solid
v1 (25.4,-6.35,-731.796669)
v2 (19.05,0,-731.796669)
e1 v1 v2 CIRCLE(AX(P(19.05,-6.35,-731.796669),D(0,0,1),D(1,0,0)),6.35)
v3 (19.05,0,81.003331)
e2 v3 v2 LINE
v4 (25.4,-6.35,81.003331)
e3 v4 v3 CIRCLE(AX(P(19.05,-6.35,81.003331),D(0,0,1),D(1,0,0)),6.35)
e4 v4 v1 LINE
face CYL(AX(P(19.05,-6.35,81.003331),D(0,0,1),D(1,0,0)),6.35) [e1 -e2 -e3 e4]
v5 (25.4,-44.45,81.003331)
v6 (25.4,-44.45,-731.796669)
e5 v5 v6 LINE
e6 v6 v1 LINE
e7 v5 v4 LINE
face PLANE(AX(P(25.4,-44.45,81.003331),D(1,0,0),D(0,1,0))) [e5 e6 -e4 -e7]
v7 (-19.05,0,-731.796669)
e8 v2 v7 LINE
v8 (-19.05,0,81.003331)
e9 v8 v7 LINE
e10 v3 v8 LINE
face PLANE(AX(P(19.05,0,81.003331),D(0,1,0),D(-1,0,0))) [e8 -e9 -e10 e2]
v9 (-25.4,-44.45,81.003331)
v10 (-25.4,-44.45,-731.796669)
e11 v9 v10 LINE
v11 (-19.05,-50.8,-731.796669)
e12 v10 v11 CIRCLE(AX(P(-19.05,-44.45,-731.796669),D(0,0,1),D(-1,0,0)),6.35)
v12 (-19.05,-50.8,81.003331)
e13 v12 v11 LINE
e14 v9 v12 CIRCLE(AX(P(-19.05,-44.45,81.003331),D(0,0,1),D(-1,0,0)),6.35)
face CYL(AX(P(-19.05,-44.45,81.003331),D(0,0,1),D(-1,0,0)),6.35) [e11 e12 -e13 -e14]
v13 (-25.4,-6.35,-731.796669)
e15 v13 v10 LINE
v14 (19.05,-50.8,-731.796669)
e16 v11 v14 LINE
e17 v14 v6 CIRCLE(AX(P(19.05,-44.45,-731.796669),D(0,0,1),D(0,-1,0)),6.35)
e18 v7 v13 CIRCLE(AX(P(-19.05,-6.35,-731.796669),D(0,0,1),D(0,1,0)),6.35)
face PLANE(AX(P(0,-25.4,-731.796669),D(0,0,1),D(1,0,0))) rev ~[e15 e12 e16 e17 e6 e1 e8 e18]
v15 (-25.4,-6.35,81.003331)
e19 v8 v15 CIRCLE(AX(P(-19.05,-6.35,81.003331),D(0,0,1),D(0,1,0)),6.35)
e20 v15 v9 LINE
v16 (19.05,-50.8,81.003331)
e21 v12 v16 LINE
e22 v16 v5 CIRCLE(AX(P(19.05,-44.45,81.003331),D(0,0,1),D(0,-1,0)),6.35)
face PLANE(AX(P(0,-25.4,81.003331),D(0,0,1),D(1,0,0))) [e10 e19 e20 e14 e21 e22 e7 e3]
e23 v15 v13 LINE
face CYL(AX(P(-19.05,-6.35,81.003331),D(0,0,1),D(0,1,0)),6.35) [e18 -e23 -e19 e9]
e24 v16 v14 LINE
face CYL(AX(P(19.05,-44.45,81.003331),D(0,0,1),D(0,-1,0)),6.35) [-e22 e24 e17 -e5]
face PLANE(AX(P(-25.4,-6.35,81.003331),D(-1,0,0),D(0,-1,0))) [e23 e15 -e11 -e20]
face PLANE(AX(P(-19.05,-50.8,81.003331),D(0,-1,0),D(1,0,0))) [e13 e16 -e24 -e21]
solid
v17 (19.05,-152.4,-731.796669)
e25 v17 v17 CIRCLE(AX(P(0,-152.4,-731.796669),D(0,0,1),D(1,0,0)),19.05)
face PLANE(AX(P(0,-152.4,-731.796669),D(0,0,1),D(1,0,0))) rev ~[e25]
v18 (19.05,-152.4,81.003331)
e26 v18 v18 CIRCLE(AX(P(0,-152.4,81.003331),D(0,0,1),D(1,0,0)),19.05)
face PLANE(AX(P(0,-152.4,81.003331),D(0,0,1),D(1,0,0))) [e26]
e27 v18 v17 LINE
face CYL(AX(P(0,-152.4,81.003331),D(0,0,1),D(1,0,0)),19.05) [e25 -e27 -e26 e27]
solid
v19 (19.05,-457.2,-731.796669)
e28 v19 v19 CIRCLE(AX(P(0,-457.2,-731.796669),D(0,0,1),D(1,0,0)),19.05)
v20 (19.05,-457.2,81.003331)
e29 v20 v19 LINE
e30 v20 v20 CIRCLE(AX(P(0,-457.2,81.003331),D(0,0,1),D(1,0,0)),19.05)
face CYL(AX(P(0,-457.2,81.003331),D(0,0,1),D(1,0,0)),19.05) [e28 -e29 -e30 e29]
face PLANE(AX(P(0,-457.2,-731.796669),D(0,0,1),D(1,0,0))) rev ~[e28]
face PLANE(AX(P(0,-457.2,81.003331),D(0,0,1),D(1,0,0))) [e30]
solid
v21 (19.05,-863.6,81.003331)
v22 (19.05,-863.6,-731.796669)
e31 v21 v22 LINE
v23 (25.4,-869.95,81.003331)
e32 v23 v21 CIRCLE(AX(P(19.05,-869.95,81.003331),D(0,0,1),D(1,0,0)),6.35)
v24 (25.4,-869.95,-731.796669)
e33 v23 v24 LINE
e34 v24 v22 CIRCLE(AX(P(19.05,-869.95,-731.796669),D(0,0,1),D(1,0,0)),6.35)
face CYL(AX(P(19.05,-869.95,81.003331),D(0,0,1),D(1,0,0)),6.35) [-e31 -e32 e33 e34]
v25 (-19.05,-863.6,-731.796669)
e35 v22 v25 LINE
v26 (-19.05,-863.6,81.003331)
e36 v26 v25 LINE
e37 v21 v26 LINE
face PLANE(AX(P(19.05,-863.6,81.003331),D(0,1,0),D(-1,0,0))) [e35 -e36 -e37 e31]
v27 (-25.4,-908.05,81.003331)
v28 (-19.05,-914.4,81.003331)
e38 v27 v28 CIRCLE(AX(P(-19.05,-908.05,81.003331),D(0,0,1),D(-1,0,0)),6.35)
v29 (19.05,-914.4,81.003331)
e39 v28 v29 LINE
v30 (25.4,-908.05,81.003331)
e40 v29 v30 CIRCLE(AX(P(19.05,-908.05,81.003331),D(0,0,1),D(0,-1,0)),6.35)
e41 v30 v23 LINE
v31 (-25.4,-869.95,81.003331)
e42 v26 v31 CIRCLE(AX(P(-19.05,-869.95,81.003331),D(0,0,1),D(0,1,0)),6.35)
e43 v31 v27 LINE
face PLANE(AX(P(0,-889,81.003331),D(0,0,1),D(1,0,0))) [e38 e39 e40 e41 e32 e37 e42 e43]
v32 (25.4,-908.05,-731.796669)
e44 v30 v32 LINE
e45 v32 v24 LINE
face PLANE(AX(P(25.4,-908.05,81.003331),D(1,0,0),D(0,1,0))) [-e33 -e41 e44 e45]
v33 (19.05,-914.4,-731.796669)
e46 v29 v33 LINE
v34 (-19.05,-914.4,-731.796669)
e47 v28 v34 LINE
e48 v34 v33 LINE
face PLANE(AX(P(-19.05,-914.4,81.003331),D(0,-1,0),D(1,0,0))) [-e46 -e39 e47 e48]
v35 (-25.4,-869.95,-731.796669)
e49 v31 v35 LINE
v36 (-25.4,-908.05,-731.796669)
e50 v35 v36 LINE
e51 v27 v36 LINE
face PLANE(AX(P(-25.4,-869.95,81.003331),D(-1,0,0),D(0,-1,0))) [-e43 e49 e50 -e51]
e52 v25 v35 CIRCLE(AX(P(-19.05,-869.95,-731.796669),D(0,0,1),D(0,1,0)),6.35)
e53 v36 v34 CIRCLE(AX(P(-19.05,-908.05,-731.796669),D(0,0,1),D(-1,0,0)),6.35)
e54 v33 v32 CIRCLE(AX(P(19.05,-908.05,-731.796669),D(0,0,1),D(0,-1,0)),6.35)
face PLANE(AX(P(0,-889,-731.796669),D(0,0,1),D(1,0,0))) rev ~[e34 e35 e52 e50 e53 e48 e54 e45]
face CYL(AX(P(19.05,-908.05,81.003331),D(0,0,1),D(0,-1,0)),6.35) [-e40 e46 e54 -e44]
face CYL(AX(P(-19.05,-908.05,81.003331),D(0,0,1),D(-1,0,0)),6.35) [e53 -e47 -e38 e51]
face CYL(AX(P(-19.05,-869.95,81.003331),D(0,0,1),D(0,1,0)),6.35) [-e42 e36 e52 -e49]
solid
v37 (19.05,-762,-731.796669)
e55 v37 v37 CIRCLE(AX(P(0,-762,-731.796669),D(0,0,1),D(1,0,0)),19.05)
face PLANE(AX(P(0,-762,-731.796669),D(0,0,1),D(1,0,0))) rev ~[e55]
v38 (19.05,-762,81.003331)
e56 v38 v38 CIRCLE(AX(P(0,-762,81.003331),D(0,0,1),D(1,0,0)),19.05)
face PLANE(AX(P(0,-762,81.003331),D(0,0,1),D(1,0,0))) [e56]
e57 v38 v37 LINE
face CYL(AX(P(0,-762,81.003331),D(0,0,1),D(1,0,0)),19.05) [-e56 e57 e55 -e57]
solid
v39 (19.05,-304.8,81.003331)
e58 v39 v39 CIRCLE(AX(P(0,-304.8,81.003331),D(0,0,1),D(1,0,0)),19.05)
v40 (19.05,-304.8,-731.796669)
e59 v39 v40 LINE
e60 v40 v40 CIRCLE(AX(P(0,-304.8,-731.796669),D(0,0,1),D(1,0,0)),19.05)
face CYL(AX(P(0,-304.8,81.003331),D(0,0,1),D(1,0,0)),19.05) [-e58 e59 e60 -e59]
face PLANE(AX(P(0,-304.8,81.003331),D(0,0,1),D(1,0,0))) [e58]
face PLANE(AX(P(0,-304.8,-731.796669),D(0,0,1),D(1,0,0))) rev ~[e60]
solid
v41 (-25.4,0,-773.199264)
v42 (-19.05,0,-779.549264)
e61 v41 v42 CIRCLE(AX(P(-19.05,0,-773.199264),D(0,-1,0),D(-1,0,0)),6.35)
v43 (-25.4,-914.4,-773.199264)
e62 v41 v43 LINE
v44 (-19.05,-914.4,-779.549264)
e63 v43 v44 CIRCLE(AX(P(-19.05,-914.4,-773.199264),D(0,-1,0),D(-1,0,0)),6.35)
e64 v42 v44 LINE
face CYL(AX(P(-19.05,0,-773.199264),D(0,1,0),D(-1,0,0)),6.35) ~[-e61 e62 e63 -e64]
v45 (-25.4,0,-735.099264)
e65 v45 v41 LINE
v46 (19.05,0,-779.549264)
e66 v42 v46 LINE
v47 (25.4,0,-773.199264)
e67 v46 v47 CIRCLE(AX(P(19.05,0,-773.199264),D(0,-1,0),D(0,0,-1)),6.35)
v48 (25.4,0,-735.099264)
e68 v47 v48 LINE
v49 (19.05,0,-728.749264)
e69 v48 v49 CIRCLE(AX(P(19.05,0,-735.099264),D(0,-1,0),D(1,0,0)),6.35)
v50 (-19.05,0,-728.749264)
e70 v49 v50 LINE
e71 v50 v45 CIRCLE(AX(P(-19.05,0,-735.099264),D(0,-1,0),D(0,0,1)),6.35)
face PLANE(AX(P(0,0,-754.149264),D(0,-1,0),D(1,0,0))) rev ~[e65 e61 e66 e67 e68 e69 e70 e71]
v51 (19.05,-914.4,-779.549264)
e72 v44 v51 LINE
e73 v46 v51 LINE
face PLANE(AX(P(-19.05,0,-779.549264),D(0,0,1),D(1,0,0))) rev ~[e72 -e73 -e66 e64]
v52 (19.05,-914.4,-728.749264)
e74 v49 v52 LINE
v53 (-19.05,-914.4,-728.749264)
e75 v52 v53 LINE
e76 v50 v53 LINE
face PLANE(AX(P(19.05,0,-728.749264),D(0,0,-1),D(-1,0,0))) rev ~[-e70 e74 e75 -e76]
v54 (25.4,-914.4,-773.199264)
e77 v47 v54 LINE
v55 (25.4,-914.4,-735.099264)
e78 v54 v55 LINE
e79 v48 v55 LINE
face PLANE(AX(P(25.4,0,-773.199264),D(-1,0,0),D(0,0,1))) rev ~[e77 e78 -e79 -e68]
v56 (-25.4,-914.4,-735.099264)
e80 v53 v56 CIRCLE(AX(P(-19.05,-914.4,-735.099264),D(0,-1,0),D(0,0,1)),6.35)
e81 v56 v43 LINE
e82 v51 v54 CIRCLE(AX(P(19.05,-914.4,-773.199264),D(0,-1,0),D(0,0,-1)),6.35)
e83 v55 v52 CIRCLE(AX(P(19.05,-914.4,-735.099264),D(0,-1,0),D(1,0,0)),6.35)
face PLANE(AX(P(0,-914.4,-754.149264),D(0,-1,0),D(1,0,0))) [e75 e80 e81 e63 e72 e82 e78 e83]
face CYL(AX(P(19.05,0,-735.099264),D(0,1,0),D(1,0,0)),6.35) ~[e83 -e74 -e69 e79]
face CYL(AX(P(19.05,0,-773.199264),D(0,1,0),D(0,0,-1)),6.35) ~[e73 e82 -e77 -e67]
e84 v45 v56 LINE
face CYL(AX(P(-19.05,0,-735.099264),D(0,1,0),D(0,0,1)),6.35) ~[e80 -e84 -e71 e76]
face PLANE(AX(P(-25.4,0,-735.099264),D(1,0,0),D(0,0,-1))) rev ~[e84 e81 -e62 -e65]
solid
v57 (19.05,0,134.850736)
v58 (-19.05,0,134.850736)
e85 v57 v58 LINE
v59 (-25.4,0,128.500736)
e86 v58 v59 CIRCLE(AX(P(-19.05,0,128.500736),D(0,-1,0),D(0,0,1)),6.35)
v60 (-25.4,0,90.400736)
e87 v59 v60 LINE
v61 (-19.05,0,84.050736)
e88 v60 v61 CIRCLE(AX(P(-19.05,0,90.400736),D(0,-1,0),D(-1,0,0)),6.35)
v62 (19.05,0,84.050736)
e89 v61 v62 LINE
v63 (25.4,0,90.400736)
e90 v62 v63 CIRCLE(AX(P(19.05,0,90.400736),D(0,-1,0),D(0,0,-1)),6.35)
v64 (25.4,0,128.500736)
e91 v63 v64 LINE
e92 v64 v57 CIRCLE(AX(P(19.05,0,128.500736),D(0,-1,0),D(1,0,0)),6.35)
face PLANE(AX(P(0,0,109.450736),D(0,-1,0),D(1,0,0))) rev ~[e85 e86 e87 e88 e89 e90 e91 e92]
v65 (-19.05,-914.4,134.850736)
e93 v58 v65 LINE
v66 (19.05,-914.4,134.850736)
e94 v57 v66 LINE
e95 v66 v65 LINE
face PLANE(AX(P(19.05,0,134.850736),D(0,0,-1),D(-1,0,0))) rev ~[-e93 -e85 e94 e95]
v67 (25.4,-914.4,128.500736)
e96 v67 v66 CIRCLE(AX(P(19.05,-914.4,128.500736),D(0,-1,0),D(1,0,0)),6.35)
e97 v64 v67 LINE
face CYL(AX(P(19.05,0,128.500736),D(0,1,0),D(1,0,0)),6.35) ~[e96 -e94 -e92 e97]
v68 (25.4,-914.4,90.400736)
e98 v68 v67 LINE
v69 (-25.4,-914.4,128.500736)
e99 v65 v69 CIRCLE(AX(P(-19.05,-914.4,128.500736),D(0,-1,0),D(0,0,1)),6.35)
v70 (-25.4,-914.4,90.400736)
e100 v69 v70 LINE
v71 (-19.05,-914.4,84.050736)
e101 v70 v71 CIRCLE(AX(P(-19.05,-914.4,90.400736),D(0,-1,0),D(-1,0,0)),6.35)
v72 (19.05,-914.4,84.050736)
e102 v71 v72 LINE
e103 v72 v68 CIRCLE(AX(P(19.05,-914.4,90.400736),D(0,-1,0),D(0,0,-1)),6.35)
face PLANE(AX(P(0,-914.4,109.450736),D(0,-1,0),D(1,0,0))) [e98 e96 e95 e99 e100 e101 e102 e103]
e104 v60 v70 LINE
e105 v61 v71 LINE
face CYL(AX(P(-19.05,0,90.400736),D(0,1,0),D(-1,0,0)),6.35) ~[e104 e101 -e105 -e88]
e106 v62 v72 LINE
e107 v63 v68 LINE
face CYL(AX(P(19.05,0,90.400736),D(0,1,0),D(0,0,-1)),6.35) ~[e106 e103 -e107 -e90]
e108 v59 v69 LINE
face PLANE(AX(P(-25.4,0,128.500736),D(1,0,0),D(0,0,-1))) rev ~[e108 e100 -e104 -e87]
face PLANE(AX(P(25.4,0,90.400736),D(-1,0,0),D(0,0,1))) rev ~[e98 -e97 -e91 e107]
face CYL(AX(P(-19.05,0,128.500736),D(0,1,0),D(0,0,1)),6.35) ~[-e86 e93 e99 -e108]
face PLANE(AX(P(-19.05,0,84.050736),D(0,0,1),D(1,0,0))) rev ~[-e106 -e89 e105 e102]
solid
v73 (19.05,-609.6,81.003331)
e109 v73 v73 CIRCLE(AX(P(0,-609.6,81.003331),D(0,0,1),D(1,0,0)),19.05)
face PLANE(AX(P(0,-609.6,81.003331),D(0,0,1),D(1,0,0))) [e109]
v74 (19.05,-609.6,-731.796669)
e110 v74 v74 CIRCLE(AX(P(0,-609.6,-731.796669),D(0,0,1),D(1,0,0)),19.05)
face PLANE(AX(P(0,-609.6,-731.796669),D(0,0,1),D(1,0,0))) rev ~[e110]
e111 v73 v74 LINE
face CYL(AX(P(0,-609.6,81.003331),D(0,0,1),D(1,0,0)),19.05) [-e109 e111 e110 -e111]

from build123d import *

# Parameters (mm, degrees)
F1_DEPTH = 914.4
F3_R     = 19.05
F4_DEPTH = 812.8


with BuildPart() as f1:
    # F0 (on Front) → F1 (new body)
    with BuildSketch(Plane.XZ):
        with BuildLine():
            Line((-19.05, 84.0507361742), (19.05, 84.0507361742))
            ThreePointArc((19.05, 84.0507361742), (23.5401280605, 85.9106081136), (25.4, 90.4007361742))
            Line((25.4, 90.4007361742), (25.4, 128.5007361742))
            ThreePointArc((25.4, 128.5007361742), (23.5401280605, 132.9908642347), (19.05, 134.8507361742))
            Line((19.05, 134.8507361742), (-19.05, 134.8507361742))
            ThreePointArc((-19.05, 134.8507361742), (-23.5401280605, 132.9908642347), (-25.4, 128.5007361742))
            Line((-25.4, 128.5007361742), (-25.4, 90.4007361742))
            ThreePointArc((-25.4, 90.4007361742), (-23.5401280605, 85.9106081136), (-19.05, 84.0507361742))
        make_face()
    extrude(amount=F1_DEPTH)


with BuildPart() as f1b:
    # F0 (on Front) → F1, piece 2 (new body)
    with BuildSketch(Plane.XZ):
        with BuildLine():
            ThreePointArc((25.4, -735.0992638258), (23.5401280605, -730.6091357653), (19.05, -728.7492638258))
            Line((19.05, -728.7492638258), (-19.05, -728.7492638258))
            ThreePointArc((-19.05, -728.7492638258), (-23.5401280605, -730.6091357653), (-25.4, -735.0992638258))
            Line((-25.4, -735.0992638258), (-25.4, -773.1992638258))
            ThreePointArc((-25.4, -773.1992638258), (-23.5401280605, -777.6893918864), (-19.05, -779.5492638258))
            Line((-19.05, -779.5492638258), (19.05, -779.5492638258))
            ThreePointArc((19.05, -779.5492638258), (23.5401280605, -777.6893918864), (25.4, -773.1992638258))
            Line((25.4, -773.1992638258), (25.4, -735.0992638258))
        make_face()
    extrude(amount=F1_DEPTH)


with BuildPart() as f4:
    # F3 (on offset) → F4 (new body)
    with BuildSketch(Plane.XY.offset(81.0033306479)):
        with Locations((0, -152.4)):
            Circle(F3_R)
    extrude(amount=-F4_DEPTH)


with BuildPart() as f4b:
    # F3 (on offset) → F4, piece 2 (new body)
    with BuildSketch(Plane.XY.offset(81.0033306479)):
        with Locations((0, -304.8)):
            Circle(F3_R)
    extrude(amount=-F4_DEPTH)


with BuildPart() as f4c:
    # F3 (on offset) → F4, piece 3 (new body)
    with BuildSketch(Plane.XY.offset(81.0033306479)):
        with Locations((0, -609.6)):
            Circle(F3_R)
    extrude(amount=-F4_DEPTH)


with BuildPart() as f4d:
    # F3 (on offset) → F4, piece 4 (new body)
    with BuildSketch(Plane.XY.offset(81.0033306479)):
        with Locations((0, -762)):
            Circle(F3_R)
    extrude(amount=-F4_DEPTH)


with BuildPart() as f4e:
    # F3 (on offset) → F4, piece 5 (new body)
    with BuildSketch(Plane.XY.offset(81.0033306479)):
        with Locations((0, -457.2)):
            Circle(F3_R)
    extrude(amount=-F4_DEPTH)


with BuildPart() as f4f:
    # F3 (on offset) → F4, piece 6 (new body)
    with BuildSketch(Plane.XY.offset(81.0033306479)):
        with BuildLine():
            ThreePointArc((25.4, -6.35), (23.5401280605, -1.8598719395), (19.05, 0))
            Line((19.05, 0), (-19.05, 0))
            ThreePointArc((-19.05, 0), (-23.5401280605, -1.8598719395), (-25.4, -6.35))
            Line((-25.4, -6.35), (-25.4, -44.45))
            ThreePointArc((-25.4, -44.45), (-23.5401280605, -48.9401280605), (-19.05, -50.8))
            Line((-19.05, -50.8), (19.05, -50.8))
            ThreePointArc((19.05, -50.8), (23.5401280605, -48.9401280605), (25.4, -44.45))
            Line((25.4, -44.45), (25.4, -6.35))
        make_face()
    extrude(amount=-F4_DEPTH)


with BuildPart() as f4g:
    # F3 (on offset) → F4, piece 7 (new body)
    with BuildSketch(Plane.XY.offset(81.0033306479)):
        with BuildLine():
            ThreePointArc((25.4, -869.95), (23.5401280605, -865.4598719395), (19.05, -863.6))
            Line((19.05, -863.6), (-19.05, -863.6))
            ThreePointArc((-19.05, -863.6), (-23.5401280605, -865.4598719395), (-25.4, -869.95))
            Line((-25.4, -869.95), (-25.4, -908.05))
            ThreePointArc((-25.4, -908.05), (-23.5401280605, -912.5401280605), (-19.05, -914.4))
            Line((-19.05, -914.4), (19.05, -914.4))
            ThreePointArc((19.05, -914.4), (23.5401280605, -912.5401280605), (25.4, -908.05))
            Line((25.4, -908.05), (25.4, -869.95))
        make_face()
    extrude(amount=-F4_DEPTH)


solid = Compound([f1.part, f1b.part, f4.part, f4b.part, f4c.part, f4d.part, f4e.part, f4f.part, f4g.part])
